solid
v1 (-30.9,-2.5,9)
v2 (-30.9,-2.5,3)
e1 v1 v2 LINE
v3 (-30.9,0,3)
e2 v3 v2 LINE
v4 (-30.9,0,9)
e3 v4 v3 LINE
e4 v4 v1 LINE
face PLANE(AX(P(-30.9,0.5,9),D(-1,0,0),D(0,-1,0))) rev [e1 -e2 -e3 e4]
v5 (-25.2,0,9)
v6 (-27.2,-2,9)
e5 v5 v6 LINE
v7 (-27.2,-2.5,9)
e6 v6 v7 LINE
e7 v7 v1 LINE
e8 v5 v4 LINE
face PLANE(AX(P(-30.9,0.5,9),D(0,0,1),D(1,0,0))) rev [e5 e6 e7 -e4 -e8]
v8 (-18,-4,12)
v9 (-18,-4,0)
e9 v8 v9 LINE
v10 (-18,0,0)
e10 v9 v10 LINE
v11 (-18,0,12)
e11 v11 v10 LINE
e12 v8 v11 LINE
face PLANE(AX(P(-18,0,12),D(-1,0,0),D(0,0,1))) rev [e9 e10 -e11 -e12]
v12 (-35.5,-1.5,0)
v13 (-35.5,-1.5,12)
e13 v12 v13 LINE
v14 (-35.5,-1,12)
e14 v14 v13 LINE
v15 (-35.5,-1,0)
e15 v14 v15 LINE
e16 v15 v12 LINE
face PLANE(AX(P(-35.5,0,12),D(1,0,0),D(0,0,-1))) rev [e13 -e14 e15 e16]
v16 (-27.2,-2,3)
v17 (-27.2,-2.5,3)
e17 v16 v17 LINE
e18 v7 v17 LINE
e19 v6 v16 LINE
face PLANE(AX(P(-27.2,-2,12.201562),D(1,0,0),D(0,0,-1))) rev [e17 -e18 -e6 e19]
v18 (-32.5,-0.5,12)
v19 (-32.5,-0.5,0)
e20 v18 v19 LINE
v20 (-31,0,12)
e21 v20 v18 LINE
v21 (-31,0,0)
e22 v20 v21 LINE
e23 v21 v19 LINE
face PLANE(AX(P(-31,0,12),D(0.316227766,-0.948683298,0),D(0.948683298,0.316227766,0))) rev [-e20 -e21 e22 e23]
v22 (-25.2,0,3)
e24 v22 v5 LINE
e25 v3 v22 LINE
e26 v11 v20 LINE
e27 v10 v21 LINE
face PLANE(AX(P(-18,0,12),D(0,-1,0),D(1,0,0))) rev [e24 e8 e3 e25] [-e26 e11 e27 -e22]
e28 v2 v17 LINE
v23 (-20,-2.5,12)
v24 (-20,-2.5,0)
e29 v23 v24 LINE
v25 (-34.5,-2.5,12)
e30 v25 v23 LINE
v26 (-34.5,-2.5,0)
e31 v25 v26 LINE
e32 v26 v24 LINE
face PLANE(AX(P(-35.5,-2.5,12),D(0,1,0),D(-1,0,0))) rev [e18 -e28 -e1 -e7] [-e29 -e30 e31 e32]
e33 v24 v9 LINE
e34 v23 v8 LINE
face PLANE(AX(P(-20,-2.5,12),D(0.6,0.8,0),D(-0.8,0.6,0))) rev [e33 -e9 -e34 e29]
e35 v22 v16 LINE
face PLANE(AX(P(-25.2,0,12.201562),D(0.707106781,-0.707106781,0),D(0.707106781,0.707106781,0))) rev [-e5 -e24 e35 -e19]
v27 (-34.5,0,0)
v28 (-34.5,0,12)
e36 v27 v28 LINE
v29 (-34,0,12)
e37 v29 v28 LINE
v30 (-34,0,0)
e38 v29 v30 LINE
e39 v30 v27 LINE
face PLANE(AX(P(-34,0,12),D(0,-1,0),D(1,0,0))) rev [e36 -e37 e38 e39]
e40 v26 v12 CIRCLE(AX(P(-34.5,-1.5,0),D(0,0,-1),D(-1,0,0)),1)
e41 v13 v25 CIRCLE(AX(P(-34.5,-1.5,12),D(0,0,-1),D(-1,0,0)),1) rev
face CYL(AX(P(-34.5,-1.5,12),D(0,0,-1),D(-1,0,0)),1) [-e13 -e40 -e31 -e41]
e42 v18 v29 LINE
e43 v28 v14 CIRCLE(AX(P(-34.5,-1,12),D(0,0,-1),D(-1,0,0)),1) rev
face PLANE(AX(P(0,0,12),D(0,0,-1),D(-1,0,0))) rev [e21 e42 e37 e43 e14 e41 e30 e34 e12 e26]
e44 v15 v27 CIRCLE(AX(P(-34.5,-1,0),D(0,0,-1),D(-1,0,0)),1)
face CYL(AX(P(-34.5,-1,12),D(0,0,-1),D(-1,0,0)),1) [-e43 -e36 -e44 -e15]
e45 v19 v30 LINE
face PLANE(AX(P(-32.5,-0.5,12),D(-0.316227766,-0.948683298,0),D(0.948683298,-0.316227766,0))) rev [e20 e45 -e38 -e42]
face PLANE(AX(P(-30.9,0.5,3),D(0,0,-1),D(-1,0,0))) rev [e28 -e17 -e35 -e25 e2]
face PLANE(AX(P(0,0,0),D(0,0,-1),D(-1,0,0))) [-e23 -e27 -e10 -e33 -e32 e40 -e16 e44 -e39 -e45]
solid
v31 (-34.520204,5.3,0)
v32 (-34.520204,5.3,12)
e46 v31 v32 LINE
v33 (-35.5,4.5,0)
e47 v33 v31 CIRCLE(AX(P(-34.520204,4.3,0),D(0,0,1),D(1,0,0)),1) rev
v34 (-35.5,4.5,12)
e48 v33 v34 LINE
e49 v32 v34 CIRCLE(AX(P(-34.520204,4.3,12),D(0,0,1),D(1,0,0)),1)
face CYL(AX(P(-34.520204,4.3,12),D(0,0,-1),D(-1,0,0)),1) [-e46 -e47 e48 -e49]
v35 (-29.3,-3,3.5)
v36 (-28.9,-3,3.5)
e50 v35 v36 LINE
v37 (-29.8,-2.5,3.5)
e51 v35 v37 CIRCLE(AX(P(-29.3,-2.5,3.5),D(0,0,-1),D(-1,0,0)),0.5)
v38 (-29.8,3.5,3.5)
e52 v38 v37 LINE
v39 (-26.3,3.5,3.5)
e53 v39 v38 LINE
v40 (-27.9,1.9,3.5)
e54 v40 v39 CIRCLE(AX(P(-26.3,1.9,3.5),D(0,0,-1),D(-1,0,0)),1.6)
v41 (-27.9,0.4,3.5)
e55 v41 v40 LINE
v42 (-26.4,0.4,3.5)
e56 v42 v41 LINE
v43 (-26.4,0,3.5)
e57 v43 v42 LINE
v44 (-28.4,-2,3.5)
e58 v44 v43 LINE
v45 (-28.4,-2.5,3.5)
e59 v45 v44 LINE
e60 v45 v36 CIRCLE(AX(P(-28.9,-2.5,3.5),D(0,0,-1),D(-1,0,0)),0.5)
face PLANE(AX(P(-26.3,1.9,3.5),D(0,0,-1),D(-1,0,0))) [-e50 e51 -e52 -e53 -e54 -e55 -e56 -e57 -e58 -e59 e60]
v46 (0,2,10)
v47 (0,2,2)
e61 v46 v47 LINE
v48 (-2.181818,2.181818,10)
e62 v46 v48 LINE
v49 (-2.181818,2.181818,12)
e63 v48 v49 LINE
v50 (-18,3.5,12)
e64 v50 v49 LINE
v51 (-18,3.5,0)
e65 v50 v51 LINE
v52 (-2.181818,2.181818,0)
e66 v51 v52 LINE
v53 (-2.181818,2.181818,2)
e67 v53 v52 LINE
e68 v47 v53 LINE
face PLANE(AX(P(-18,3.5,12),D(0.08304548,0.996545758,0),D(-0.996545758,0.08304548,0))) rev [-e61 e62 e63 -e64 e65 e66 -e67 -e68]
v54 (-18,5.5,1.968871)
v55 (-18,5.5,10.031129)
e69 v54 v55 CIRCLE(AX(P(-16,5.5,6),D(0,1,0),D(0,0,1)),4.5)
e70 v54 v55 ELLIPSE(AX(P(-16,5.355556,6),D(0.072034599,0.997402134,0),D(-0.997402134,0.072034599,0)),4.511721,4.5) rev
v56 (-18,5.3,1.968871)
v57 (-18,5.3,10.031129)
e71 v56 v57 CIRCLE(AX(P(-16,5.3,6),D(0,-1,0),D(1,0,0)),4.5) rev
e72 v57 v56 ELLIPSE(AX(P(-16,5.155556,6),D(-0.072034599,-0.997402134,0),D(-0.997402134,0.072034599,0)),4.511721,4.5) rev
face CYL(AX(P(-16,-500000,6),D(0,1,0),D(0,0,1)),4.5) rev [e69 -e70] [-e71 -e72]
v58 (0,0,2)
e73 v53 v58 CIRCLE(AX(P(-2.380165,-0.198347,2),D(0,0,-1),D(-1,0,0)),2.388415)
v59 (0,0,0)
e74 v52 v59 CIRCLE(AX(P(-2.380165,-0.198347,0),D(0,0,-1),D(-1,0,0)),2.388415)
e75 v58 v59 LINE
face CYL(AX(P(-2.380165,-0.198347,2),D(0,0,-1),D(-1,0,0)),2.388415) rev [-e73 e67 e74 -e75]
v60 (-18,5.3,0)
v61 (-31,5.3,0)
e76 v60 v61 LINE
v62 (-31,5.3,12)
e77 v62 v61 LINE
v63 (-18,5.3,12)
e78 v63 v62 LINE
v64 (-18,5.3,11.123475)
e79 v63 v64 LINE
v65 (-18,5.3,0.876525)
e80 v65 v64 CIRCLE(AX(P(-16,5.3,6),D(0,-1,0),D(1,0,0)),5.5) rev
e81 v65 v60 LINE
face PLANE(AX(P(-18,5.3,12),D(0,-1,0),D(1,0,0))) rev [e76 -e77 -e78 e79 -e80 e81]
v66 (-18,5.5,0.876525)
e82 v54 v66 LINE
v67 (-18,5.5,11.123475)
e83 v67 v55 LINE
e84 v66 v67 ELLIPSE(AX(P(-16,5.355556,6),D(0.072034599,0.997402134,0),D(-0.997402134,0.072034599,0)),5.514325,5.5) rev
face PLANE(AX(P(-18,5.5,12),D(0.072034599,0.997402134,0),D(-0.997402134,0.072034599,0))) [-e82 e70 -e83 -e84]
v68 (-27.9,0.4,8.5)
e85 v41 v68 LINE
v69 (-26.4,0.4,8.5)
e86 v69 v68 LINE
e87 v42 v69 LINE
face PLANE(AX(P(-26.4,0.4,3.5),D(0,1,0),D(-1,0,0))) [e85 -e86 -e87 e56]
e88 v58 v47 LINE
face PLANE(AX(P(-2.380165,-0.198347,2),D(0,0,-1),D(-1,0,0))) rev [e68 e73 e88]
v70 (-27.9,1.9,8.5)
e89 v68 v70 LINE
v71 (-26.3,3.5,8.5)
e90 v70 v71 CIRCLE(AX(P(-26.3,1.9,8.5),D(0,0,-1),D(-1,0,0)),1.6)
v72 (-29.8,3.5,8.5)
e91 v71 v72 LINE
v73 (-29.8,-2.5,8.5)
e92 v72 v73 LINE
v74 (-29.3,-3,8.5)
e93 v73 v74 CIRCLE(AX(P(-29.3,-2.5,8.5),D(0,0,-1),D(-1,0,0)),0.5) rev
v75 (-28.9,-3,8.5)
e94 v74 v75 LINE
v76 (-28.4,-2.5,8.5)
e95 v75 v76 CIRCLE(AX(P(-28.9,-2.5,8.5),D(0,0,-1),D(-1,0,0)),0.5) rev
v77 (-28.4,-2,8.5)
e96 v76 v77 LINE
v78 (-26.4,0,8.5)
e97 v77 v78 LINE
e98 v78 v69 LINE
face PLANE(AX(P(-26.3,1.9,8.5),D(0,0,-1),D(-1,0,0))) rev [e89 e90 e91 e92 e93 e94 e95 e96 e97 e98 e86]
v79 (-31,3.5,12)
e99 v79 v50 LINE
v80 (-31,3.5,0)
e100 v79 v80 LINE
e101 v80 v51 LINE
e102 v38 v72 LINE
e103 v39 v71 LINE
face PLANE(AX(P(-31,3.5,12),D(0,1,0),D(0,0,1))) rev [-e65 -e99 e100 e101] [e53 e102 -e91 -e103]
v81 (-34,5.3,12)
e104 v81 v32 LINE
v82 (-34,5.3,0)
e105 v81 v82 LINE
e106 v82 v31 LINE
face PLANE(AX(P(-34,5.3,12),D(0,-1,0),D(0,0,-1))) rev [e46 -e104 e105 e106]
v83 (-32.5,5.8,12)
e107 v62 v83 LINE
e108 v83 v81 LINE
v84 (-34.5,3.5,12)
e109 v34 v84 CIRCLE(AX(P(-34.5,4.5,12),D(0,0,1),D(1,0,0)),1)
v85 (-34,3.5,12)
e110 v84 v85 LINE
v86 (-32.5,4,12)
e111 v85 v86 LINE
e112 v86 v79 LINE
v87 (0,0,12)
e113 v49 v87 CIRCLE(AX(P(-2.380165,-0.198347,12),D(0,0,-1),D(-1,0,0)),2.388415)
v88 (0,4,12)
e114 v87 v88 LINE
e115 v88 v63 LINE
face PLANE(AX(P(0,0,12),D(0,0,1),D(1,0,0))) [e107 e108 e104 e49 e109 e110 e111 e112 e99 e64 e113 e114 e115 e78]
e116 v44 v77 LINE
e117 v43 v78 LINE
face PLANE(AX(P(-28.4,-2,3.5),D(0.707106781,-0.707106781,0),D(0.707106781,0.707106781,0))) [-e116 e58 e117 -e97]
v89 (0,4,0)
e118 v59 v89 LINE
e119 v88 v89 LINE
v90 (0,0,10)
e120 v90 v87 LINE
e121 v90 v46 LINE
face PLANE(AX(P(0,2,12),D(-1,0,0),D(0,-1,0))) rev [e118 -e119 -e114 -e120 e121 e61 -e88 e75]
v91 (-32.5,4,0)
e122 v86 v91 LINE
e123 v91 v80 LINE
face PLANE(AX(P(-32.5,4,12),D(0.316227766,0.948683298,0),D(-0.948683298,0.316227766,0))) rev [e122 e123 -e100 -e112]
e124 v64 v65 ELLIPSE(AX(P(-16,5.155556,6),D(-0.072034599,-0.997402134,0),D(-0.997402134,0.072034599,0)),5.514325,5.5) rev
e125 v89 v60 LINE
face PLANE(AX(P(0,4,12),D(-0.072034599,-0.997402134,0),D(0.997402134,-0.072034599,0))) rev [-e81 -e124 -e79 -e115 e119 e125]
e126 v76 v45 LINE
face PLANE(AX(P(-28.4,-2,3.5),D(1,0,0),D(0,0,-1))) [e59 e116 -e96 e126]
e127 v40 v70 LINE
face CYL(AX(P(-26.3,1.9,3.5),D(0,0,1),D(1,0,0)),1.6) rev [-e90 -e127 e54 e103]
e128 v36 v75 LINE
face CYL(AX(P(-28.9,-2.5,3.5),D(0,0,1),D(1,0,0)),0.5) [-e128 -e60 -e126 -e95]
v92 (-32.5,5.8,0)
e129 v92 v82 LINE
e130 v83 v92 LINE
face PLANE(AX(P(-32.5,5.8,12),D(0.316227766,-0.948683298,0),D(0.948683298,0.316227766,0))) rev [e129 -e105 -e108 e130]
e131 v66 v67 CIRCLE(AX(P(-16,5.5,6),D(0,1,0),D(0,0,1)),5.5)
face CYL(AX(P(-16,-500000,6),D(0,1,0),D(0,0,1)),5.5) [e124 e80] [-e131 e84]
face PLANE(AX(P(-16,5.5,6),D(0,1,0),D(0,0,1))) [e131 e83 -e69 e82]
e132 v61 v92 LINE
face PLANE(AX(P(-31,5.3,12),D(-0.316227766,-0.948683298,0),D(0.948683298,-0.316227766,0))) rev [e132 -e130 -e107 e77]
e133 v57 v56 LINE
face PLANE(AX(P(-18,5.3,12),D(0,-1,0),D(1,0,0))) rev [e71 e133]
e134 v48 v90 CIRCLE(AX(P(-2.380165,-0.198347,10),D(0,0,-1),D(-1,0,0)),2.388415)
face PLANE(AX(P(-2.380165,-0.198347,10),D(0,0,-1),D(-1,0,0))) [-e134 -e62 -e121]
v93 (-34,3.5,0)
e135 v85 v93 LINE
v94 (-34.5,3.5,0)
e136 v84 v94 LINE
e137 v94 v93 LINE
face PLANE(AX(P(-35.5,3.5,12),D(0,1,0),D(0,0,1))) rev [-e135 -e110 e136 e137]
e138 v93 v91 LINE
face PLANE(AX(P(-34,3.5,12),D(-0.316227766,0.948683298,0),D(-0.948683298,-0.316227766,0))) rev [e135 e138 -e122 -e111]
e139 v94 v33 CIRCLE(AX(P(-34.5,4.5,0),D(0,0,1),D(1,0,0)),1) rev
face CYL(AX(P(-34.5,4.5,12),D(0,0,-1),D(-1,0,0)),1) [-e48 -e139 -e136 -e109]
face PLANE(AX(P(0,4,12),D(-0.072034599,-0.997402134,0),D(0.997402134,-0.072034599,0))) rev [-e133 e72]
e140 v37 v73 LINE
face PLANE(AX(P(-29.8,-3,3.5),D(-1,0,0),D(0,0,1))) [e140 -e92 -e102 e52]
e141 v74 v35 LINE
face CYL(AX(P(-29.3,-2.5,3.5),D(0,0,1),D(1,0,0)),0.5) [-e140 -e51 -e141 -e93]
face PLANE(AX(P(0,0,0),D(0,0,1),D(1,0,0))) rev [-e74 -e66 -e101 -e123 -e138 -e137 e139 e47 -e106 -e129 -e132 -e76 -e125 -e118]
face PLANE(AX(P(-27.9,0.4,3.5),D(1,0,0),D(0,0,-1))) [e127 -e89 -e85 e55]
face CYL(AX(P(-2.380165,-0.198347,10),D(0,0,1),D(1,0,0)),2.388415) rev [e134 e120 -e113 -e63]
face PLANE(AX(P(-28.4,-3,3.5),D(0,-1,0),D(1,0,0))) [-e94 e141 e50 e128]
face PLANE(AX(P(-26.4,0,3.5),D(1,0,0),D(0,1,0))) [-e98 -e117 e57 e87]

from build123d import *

# Parameters (mm, degrees)
BOSS_EXTRUDE1_DEPTH   = 12
BOSS_EXTRUDE1_2_DEPTH = 12
SKETCH2_W             = 5.7
SKETCH2_H             = 6
CUT_EXTRUDE1_DEPTH    = 3
BOSS_EXTRUDE2_DEPTH   = 6
BOSS_EXTRUDE3_START   = -6
BOSS_EXTRUDE3_DEPTH   = 2.5
FILLET7_R             = 1
FILLET8_R             = 1
FILLET10_R            = 1
FILLET11_R            = 1
BOSS_EXTRUDE4_DEPTH   = 2
BOSS_EXTRUDE5_START   = -10
BOSS_EXTRUDE5_DEPTH   = 2
FILLET12_R            = 0.5
BOSS_EXTRUDE7_REACH   = 45.42
BOSS_EXTRUDE7_START   = 5.5
SKETCH6_R             = 5.5
SKETCH6_R_2           = 4.5
CUT_EXTRUDE3_DEPTH    = 38.919520039


with BuildPart() as part:
    # Sketch1 → Boss-Extrude1 (new body)
    with BuildSketch(Plane.XY):
        Polygon((0, 4), (-18, 5.3), (-31, 5.3), (-32.5, 5.8), (-34, 5.3), (-35.5, 5.3), (-35.5, 3.5), (-34, 3.5), (-32.5, 4), (-31, 3.5), (-18, 3.5), (0, 2), align=None)
    extrude(amount=BOSS_EXTRUDE1_DEPTH)

    # Sketch4 → Boss-Extrude3 (add, symmetric)
    with BuildSketch(Plane.XY.offset(12).offset(BOSS_EXTRUDE3_START)):
        with BuildLine():
            Line((-28.4, -2), (-26.4, 0))
            Line((-26.4, 0), (-26.4, 0.4))
            Line((-26.4, 0.4), (-27.9, 0.4))
            Line((-27.9, 0.4), (-27.9, 1.9))
            ThreePointArc((-27.9, 1.9), (-27.43137085, 3.03137085), (-26.3, 3.5))
            Line((-26.3, 3.5), (-29.8, 3.5))
            Line((-29.8, 3.5), (-29.8, -3))
            Line((-29.8, -3), (-28.4, -3))
            Line((-28.4, -3), (-28.4, -2))
        make_face()
    extrude(amount=BOSS_EXTRUDE3_DEPTH, both=True)

    # Fillet8
    fillet8_edges = [part.edges().sort_by_distance(p)[0] for p in [
        (-35.5, 3.5, 6),
    ]]
    fillet(fillet8_edges, radius=FILLET8_R)

    # Fillet10
    # the kernel refuses this fillet: 1 mm, written as the material it takes off along each edge
    with BuildSketch(Plane(origin=(-35.5, 5.3, -2.449489743), x_dir=(1.545430450277731e-12, -1.0, 0), z_dir=(0, 0, 1))) as fillet10_piece_1:
        with BuildLine():
            CenterArc((1, 0.979795897), FILLET10_R, 180, 78.463040967)
            Line((0, 0.979795897), (-0.02, 0.979795897))
            Line((-0.02, 0.979795897), (-0.02, 0))
            Line((-0.02, 0), (0, -0.02))
            ThreePointArc((0, -0.02), (0.4, -0.02), (0.796, -0.019595918))
            Line((0.796, -0.019595918), (0.8, 0))
        make_face()
    extrude(amount=16.898979486, mode=Mode.SUBTRACT)

    # Sketch5 → Boss-Extrude4 (add)
    with BuildSketch(Plane.XY.offset(12)):
        with BuildLine():
            Line((0, 2), (0, 0))
            ThreePointArc((0, 0), (-0.691300526, 1.490517656), (-2.181818182, 2.181818182))
            Line((-2.181818182, 2.181818182), (0, 2))
        make_face()
    extrude(amount=-BOSS_EXTRUDE4_DEPTH)

    # Sketch5<2> → Boss-Extrude5 (add)
    with BuildSketch(Plane.XY.offset(12).offset(BOSS_EXTRUDE5_START)):
        with BuildLine():
            Line((0, 2), (0, 0))
            ThreePointArc((0, 0), (-0.691300526, 1.490517656), (-2.181818182, 2.181818182))
            Line((-2.181818182, 2.181818182), (0, 2))
        make_face()
    extrude(amount=-BOSS_EXTRUDE5_DEPTH)

    # Fillet12
    fillet12_edges = [part.edges().sort_by_distance(p)[0] for p in [
        (-28.4, -3, 6),
        (-29.8, -3, 6),
    ]]
    fillet(fillet12_edges, radius=FILLET12_R)

    # Sketch6 → Boss-Extrude7 (add, up to next)
    with BuildSketch(Plane(origin=(0, 0, 0), x_dir=(1, 0, 0), z_dir=(0, 1, 0)).offset(BOSS_EXTRUDE7_START), mode=Mode.PRIVATE) as boss_extrude7_sk1:
        with Locations(Location((-16, -6, 0), (0, 0, 270))):
            Circle(SKETCH6_R)
        with Locations(Location((-16, -6, 0), (0, 0, 270))):
            Circle(SKETCH6_R_2, mode=Mode.SUBTRACT)
    boss_extrude7_tool1 = extrude(boss_extrude7_sk1.sketch, amount=-BOSS_EXTRUDE7_REACH, mode=Mode.PRIVATE) - part.part
    add(boss_extrude7_tool1.solids().sort_by_distance((-16, 5.5, 0.655563))[0])

    # Sketch7 → Cut-Extrude3 (cut, through all)
    with BuildSketch(Plane.XY):
        Polygon((-18, 5.5), (-8, 4.777777778), (-8, 5.5), align=None)
    extrude(amount=CUT_EXTRUDE3_DEPTH, mode=Mode.SUBTRACT)


with BuildPart() as body_2:
    # Sketch1 → Boss-Extrude1 2 (new body)
    with BuildSketch(Plane.XY):
        Polygon((-35.5, -2.5), (-20, -2.5), (-18, -4), (-18, 0), (-31, 0), (-32.5, -0.5), (-34, 0), (-35.5, 0), align=None)
    extrude(amount=BOSS_EXTRUDE1_2_DEPTH)

    # Sketch2 → Cut-Extrude1 (cut)
    with BuildSketch(Plane.XZ.offset(2.5)):
        with Locations((-28.05, 6)):
            Rectangle(SKETCH2_W, SKETCH2_H)
    extrude(amount=-CUT_EXTRUDE1_DEPTH, mode=Mode.SUBTRACT)

    # Sketch3 → Boss-Extrude2 (add)
    with BuildSketch(Plane.XY.offset(3)):
        Polygon((-25.2, 0), (-27.2, -2), (-27.2, -2.5), (-25.2, -2.5), align=None)
    extrude(amount=BOSS_EXTRUDE2_DEPTH)

    # Fillet7
    fillet7_edges = [body_2.edges().sort_by_distance(p)[0] for p in [
        (-35.5, 0, 6),
    ]]
    fillet(fillet7_edges, radius=FILLET7_R)

    # Fillet11
    fillet11_edges = [body_2.edges().sort_by_distance(p)[0] for p in [
        (-35.5, -2.5, 6),
    ]]
    fillet(fillet11_edges, radius=FILLET11_R)


solid = Compound([part.part, body_2.part])
